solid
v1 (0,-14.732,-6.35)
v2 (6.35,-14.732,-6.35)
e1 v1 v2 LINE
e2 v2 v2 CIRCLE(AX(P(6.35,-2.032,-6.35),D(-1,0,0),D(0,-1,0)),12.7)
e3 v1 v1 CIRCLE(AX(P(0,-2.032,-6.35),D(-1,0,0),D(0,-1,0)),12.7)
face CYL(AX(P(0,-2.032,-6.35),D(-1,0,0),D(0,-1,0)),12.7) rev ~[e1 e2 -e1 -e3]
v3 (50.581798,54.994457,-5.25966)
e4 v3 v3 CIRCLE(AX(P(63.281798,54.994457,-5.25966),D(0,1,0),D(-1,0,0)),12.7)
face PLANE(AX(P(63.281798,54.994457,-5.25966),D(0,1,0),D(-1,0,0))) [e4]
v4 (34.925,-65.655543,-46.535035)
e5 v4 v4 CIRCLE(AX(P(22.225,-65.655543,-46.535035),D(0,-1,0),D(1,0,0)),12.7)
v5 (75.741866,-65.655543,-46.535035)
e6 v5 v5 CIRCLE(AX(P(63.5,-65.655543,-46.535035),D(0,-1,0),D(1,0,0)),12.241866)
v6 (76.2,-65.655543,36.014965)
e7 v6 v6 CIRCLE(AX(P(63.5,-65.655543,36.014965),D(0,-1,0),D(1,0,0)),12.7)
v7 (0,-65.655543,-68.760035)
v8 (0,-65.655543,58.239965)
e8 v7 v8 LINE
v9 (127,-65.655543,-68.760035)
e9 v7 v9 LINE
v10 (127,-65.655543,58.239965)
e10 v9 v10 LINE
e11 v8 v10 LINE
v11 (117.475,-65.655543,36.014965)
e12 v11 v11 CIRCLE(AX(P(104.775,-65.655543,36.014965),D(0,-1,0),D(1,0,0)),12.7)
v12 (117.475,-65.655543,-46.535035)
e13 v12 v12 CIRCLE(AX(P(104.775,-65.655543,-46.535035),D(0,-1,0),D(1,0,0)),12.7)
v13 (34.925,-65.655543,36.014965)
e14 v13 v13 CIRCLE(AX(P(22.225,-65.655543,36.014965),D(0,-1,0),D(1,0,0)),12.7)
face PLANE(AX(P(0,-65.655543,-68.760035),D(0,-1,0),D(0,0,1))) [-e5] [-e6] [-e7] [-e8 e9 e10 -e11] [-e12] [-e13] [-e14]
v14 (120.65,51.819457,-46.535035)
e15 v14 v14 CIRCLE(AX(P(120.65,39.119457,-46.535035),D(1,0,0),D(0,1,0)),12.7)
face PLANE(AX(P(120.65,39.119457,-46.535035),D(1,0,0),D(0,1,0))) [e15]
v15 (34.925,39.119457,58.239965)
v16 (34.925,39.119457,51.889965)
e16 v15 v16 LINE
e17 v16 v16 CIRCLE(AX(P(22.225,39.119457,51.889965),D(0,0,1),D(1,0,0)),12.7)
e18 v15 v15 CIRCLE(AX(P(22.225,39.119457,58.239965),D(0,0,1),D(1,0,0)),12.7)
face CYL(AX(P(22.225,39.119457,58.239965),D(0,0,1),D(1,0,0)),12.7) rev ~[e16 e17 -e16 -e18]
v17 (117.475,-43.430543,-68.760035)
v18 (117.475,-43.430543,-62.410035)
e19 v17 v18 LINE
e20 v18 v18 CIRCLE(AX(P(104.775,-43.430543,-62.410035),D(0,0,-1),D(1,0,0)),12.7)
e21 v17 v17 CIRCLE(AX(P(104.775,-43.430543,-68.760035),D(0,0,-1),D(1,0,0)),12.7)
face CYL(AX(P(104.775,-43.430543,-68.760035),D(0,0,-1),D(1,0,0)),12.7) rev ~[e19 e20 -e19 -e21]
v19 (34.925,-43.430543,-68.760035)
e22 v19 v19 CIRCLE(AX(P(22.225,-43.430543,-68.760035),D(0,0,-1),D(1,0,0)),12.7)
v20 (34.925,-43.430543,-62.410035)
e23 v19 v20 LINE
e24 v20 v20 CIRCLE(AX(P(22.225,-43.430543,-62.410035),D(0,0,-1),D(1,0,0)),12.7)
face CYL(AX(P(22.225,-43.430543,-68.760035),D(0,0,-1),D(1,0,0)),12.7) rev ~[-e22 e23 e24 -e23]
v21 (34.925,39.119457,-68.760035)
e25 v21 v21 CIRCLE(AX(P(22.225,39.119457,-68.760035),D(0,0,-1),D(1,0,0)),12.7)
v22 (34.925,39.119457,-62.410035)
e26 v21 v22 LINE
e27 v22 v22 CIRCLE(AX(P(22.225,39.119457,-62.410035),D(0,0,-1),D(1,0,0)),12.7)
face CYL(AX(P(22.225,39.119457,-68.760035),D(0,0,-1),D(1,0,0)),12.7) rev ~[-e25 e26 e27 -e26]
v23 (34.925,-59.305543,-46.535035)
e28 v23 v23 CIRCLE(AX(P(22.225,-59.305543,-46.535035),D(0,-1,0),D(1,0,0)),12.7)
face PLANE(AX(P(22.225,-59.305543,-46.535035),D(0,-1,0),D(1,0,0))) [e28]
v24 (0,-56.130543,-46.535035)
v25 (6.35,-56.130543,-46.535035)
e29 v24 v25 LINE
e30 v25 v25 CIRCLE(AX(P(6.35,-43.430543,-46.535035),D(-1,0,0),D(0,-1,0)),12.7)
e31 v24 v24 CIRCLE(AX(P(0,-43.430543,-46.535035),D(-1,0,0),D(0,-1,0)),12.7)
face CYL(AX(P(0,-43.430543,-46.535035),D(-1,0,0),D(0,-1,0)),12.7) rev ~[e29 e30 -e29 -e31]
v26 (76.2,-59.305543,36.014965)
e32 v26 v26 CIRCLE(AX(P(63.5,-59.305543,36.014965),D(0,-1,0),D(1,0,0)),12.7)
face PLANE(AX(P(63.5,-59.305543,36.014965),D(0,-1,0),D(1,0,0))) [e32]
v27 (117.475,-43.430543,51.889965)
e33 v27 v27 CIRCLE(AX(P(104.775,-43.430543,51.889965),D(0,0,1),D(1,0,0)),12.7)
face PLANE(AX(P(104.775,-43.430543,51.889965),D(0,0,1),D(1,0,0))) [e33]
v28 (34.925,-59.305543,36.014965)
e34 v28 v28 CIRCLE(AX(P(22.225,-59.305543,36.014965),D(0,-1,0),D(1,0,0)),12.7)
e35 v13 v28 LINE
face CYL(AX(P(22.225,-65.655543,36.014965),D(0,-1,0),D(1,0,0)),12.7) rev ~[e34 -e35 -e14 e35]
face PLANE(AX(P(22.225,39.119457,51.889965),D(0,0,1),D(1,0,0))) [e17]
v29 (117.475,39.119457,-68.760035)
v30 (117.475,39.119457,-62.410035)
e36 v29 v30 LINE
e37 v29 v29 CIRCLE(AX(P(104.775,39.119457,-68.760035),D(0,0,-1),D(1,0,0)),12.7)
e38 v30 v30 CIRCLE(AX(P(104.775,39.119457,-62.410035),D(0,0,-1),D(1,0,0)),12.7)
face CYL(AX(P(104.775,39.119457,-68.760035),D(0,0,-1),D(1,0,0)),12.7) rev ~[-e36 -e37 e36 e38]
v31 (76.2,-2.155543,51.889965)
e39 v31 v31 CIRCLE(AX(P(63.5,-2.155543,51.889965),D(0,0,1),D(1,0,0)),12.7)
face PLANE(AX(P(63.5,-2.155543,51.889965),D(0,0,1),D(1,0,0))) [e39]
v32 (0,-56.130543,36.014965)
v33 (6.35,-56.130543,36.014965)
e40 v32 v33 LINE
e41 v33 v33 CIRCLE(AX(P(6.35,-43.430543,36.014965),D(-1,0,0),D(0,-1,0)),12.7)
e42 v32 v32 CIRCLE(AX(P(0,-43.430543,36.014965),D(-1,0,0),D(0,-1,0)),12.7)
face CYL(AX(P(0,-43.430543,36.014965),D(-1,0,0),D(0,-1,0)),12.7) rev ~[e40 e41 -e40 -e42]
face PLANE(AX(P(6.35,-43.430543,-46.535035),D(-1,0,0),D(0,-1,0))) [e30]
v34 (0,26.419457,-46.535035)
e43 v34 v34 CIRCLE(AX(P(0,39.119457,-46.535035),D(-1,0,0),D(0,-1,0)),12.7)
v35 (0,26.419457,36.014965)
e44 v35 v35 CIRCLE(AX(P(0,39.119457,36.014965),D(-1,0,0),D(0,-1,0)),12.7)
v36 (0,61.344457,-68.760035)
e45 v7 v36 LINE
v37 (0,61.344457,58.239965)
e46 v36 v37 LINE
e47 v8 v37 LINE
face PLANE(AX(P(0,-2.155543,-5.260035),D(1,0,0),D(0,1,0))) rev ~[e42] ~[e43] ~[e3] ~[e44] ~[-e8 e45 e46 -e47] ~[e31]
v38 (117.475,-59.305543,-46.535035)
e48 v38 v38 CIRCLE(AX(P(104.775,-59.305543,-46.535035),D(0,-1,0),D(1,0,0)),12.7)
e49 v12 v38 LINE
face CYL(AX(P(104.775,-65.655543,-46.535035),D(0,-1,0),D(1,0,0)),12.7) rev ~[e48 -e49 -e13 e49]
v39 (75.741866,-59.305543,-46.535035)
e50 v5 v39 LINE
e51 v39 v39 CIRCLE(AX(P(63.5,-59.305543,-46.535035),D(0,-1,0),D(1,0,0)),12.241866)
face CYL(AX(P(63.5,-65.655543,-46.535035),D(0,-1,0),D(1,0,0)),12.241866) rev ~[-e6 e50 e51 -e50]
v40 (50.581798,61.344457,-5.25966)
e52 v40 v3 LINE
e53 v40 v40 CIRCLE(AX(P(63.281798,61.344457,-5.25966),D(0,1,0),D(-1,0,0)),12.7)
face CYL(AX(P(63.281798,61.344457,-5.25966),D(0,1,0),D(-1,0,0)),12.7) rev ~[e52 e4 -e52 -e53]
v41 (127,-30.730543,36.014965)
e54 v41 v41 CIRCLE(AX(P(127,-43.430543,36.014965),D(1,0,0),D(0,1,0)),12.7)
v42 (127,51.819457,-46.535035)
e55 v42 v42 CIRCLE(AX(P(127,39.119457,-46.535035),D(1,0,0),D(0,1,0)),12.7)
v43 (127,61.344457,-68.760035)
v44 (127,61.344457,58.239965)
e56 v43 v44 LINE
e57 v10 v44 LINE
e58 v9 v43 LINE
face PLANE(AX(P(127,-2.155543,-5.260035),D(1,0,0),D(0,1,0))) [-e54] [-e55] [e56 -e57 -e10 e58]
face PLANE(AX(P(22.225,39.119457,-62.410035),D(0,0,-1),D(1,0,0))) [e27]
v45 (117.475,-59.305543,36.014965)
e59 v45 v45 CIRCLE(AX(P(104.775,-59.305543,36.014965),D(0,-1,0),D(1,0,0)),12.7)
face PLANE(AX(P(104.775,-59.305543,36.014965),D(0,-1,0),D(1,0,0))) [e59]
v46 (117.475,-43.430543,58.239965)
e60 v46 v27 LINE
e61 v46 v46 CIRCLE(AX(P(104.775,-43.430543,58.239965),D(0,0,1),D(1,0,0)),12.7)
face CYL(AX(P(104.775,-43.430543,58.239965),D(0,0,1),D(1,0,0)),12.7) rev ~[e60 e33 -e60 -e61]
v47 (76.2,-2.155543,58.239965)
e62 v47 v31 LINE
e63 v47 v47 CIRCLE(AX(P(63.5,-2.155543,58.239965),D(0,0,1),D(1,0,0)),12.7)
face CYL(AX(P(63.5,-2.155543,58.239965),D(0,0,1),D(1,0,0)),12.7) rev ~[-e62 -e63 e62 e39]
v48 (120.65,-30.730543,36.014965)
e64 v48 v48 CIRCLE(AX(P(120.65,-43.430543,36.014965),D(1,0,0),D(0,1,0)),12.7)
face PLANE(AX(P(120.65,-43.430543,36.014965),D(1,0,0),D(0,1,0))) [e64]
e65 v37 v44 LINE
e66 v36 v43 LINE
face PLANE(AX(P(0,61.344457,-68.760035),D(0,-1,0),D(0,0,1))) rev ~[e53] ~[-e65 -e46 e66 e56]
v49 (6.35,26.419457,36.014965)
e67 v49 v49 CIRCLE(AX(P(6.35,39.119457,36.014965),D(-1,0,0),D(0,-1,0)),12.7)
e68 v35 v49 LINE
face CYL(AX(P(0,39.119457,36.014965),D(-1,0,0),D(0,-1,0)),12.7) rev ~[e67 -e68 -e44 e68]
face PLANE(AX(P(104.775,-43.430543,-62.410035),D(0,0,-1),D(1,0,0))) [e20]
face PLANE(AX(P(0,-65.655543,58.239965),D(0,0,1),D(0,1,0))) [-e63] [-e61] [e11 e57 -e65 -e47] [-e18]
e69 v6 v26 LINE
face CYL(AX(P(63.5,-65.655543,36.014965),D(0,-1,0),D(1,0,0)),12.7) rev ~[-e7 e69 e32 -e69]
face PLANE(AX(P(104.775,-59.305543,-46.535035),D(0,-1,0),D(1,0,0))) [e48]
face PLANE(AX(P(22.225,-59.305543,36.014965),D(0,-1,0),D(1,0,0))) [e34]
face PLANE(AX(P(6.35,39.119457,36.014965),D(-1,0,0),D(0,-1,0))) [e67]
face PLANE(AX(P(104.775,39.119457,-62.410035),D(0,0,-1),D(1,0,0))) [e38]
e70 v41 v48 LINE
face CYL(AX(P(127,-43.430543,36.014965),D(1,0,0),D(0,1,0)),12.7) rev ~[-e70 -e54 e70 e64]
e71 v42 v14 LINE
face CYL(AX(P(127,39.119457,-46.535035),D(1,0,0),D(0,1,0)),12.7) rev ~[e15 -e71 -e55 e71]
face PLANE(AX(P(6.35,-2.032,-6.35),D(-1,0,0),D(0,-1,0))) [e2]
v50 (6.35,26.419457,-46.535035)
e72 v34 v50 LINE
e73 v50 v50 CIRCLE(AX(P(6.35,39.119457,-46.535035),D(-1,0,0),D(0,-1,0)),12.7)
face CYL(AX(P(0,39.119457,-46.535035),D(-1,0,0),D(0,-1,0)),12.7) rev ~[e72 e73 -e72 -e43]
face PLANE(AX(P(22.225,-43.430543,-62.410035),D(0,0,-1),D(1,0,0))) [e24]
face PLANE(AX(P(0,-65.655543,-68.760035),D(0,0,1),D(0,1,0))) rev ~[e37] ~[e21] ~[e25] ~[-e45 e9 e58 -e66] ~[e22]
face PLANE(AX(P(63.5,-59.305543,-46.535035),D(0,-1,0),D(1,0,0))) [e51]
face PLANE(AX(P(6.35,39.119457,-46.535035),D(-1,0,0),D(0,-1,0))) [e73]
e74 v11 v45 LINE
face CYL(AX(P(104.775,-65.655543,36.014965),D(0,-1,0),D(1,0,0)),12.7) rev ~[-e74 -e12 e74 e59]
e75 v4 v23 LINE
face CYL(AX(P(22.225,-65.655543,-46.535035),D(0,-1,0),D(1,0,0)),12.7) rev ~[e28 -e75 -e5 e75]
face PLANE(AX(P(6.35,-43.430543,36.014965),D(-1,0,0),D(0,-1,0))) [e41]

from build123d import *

# Parameters (mm, degrees)
F0_W      = 127
F0_H      = 127
F1_DEPTH  = 127
F2_R      = 12.7
F3_DEPTH  = 6.35
F4_R      = 12.7
F5_DEPTH  = 6.35
F6_R      = 12.7
F7_DEPTH  = 6.35
F8_R      = 12.7
F9_DEPTH  = 6.35
F10_R     = 12.7
F11_DEPTH = 6.35
F12_R     = 12.7
F13_DEPTH = 6.35
F14_R     = 12.7
F15_DEPTH = 6.35
F16_R     = 12.7
F17_DEPTH = 6.35
F18_R     = 12.7
F19_DEPTH = 6.35
F20_R     = 12.2418661496
F21_DEPTH = 6.35
F22_R     = 12.7
F23_DEPTH = 6.35
F25_R     = 12.7
F26_DEPTH = 6.35
F27_R     = 12.7
F28_DEPTH = 6.35
F29_R     = 12.7
F30_DEPTH = 6.35
F31_R     = 12.7
F32_DEPTH = 6.35
F33_R     = 12.7
F34_DEPTH = 6.35
F35_R     = 12.7
F36_DEPTH = 6.35
F37_R     = 12.7
F38_DEPTH = 6.35
F39_R     = 12.7
F40_DEPTH = 6.35
F41_R     = 12.7
F42_DEPTH = 6.35
F43_R     = 12.7
F44_DEPTH = 6.35


# Not quite as in the source:
# - a length typed as a fraction of an inch, garbled in the dataset ("3 / 203.2 mm" for 3/8 in), is restored


with BuildPart() as f1:
    # F0 (on Right) → F1 (new body)
    with BuildSketch(Plane.YZ):
        with Locations((-2.1555427632, -5.2600353956)):
            Rectangle(F0_W, F0_H)
    extrude(amount=F1_DEPTH)

    # F2 (on face) → F3 (cut)
    with BuildSketch(Plane(origin=(0, 61.3444572368, 0), x_dir=(-1, 0, 0), z_dir=(0, 1, 0))):
        with Locations((-63.2817981055, -5.2596604964)):
            Circle(F2_R)
    extrude(amount=-F3_DEPTH, mode=Mode.SUBTRACT)

    # F4 (on face) → F5 (cut)
    with BuildSketch(Plane(origin=(0, 0, 0), x_dir=(0, -1, 0), z_dir=(-1, 0, 0))):
        with Locations((2.032, -6.35)):
            Circle(F4_R)
    extrude(amount=-F5_DEPTH, mode=Mode.SUBTRACT)

    # F6 (on face) → F7 (cut)
    with BuildSketch(Plane(origin=(0, 0, 0), x_dir=(0, -1, 0), z_dir=(-1, 0, 0))):
        with Locations((-39.1194572368, 36.0149646044)):
            Circle(F6_R)
    extrude(amount=-F7_DEPTH, mode=Mode.SUBTRACT)

    # F8 (on face) → F9 (cut)
    with BuildSketch(Plane(origin=(0, 0, 0), x_dir=(0, -1, 0), z_dir=(-1, 0, 0))):
        with Locations((43.4305427632, 36.0149646044)):
            Circle(F8_R)
    extrude(amount=-F9_DEPTH, mode=Mode.SUBTRACT)

    # F10 (on face) → F11 (cut)
    with BuildSketch(Plane(origin=(0, 0, 0), x_dir=(0, -1, 0), z_dir=(-1, 0, 0))):
        with Locations((-39.1194572368, -46.5350353956)):
            Circle(F10_R)
    extrude(amount=-F11_DEPTH, mode=Mode.SUBTRACT)

    # F12 (on face) → F13 (cut)
    with BuildSketch(Plane(origin=(0, 0, 0), x_dir=(0, -1, 0), z_dir=(-1, 0, 0))):
        with Locations((43.4305427632, -46.5350353956)):
            Circle(F12_R)
    extrude(amount=-F13_DEPTH, mode=Mode.SUBTRACT)

    # F14 (on face) → F15 (cut)
    with BuildSketch(Plane.YZ.offset(127)):
        with Locations((39.1194572368, -46.5350353956)):
            Circle(F14_R)
    extrude(amount=-F15_DEPTH, mode=Mode.SUBTRACT)

    # F16 (on face) → F17 (cut)
    with BuildSketch(Plane.YZ.offset(127)):
        with Locations((-43.4305427632, 36.0149646044)):
            Circle(F16_R)
    extrude(amount=-F17_DEPTH, mode=Mode.SUBTRACT)

    # F18 (on face) → F19 (cut)
    with BuildSketch(Plane.XZ.offset(65.6555427632)):
        with Locations((104.775, -46.5350353956)):
            Circle(F18_R)
    extrude(amount=-F19_DEPTH, mode=Mode.SUBTRACT)

    # F20 (on face) → F21 (cut)
    with BuildSketch(Plane.XZ.offset(65.6555427632)):
        with Locations((63.5, -46.5350353956)):
            Circle(F20_R)
    extrude(amount=-F21_DEPTH, mode=Mode.SUBTRACT)

    # F22 (on face) → F23 (cut)
    with BuildSketch(Plane.XZ.offset(65.6555427632)):
        with Locations((22.225, -46.5350353956)):
            Circle(F22_R)
    extrude(amount=-F23_DEPTH, mode=Mode.SUBTRACT)

    # F25 (on face) → F26 (cut)
    with BuildSketch(Plane.XZ.offset(65.6555427632)):
        with Locations((104.775, 36.0149646044)):
            Circle(F25_R)
    extrude(amount=-F26_DEPTH, mode=Mode.SUBTRACT)

    # F27 (on face) → F28 (cut)
    with BuildSketch(Plane.XZ.offset(65.6555427632)):
        with Locations((63.5, 36.0149646044)):
            Circle(F27_R)
    extrude(amount=-F28_DEPTH, mode=Mode.SUBTRACT)

    # F29 (on face) → F30 (cut)
    with BuildSketch(Plane.XZ.offset(65.6555427632)):
        with Locations((22.225, 36.0149646044)):
            Circle(F29_R)
    extrude(amount=-F30_DEPTH, mode=Mode.SUBTRACT)

    # F31 (on face) → F32 (cut)
    with BuildSketch(Plane.XY.offset(58.2399646044)):
        with Locations((104.775, -43.4305427632)):
            Circle(F31_R)
    extrude(amount=-F32_DEPTH, mode=Mode.SUBTRACT)

    # F33 (on face) → F34 (cut)
    with BuildSketch(Plane.XY.offset(58.2399646044)):
        with Locations((63.5, -2.1555427632)):
            Circle(F33_R)
    extrude(amount=-F34_DEPTH, mode=Mode.SUBTRACT)

    # F35 (on face) → F36 (cut)
    with BuildSketch(Plane.XY.offset(58.2399646044)):
        with Locations((22.225, 39.1194572368)):
            Circle(F35_R)
    extrude(amount=-F36_DEPTH, mode=Mode.SUBTRACT)

    # F37 (on face) → F38 (cut)
    with BuildSketch(Plane(origin=(0, 0, -68.7600353956), x_dir=(1, 0, 0), z_dir=(0, 0, -1))):
        with Locations((104.775, 43.4305427632)):
            Circle(F37_R)
    extrude(amount=-F38_DEPTH, mode=Mode.SUBTRACT)

    # F39 (on face) → F40 (cut)
    with BuildSketch(Plane(origin=(0, 0, -68.7600353956), x_dir=(1, 0, 0), z_dir=(0, 0, -1))):
        with Locations((22.225, 43.4305427632)):
            Circle(F39_R)
    extrude(amount=-F40_DEPTH, mode=Mode.SUBTRACT)

    # F41 (on face) → F42 (cut)
    with BuildSketch(Plane(origin=(0, 0, -68.7600353956), x_dir=(1, 0, 0), z_dir=(0, 0, -1))):
        with Locations((22.225, -39.1194572368)):
            Circle(F41_R)
    extrude(amount=-F42_DEPTH, mode=Mode.SUBTRACT)

    # F43 (on face) → F44 (cut)
    with BuildSketch(Plane(origin=(0, 0, -68.7600353956), x_dir=(1, 0, 0), z_dir=(0, 0, -1))):
        with Locations((104.775, -39.1194572368)):
            Circle(F43_R)
    extrude(amount=-F44_DEPTH, mode=Mode.SUBTRACT)


solid = f1.part
